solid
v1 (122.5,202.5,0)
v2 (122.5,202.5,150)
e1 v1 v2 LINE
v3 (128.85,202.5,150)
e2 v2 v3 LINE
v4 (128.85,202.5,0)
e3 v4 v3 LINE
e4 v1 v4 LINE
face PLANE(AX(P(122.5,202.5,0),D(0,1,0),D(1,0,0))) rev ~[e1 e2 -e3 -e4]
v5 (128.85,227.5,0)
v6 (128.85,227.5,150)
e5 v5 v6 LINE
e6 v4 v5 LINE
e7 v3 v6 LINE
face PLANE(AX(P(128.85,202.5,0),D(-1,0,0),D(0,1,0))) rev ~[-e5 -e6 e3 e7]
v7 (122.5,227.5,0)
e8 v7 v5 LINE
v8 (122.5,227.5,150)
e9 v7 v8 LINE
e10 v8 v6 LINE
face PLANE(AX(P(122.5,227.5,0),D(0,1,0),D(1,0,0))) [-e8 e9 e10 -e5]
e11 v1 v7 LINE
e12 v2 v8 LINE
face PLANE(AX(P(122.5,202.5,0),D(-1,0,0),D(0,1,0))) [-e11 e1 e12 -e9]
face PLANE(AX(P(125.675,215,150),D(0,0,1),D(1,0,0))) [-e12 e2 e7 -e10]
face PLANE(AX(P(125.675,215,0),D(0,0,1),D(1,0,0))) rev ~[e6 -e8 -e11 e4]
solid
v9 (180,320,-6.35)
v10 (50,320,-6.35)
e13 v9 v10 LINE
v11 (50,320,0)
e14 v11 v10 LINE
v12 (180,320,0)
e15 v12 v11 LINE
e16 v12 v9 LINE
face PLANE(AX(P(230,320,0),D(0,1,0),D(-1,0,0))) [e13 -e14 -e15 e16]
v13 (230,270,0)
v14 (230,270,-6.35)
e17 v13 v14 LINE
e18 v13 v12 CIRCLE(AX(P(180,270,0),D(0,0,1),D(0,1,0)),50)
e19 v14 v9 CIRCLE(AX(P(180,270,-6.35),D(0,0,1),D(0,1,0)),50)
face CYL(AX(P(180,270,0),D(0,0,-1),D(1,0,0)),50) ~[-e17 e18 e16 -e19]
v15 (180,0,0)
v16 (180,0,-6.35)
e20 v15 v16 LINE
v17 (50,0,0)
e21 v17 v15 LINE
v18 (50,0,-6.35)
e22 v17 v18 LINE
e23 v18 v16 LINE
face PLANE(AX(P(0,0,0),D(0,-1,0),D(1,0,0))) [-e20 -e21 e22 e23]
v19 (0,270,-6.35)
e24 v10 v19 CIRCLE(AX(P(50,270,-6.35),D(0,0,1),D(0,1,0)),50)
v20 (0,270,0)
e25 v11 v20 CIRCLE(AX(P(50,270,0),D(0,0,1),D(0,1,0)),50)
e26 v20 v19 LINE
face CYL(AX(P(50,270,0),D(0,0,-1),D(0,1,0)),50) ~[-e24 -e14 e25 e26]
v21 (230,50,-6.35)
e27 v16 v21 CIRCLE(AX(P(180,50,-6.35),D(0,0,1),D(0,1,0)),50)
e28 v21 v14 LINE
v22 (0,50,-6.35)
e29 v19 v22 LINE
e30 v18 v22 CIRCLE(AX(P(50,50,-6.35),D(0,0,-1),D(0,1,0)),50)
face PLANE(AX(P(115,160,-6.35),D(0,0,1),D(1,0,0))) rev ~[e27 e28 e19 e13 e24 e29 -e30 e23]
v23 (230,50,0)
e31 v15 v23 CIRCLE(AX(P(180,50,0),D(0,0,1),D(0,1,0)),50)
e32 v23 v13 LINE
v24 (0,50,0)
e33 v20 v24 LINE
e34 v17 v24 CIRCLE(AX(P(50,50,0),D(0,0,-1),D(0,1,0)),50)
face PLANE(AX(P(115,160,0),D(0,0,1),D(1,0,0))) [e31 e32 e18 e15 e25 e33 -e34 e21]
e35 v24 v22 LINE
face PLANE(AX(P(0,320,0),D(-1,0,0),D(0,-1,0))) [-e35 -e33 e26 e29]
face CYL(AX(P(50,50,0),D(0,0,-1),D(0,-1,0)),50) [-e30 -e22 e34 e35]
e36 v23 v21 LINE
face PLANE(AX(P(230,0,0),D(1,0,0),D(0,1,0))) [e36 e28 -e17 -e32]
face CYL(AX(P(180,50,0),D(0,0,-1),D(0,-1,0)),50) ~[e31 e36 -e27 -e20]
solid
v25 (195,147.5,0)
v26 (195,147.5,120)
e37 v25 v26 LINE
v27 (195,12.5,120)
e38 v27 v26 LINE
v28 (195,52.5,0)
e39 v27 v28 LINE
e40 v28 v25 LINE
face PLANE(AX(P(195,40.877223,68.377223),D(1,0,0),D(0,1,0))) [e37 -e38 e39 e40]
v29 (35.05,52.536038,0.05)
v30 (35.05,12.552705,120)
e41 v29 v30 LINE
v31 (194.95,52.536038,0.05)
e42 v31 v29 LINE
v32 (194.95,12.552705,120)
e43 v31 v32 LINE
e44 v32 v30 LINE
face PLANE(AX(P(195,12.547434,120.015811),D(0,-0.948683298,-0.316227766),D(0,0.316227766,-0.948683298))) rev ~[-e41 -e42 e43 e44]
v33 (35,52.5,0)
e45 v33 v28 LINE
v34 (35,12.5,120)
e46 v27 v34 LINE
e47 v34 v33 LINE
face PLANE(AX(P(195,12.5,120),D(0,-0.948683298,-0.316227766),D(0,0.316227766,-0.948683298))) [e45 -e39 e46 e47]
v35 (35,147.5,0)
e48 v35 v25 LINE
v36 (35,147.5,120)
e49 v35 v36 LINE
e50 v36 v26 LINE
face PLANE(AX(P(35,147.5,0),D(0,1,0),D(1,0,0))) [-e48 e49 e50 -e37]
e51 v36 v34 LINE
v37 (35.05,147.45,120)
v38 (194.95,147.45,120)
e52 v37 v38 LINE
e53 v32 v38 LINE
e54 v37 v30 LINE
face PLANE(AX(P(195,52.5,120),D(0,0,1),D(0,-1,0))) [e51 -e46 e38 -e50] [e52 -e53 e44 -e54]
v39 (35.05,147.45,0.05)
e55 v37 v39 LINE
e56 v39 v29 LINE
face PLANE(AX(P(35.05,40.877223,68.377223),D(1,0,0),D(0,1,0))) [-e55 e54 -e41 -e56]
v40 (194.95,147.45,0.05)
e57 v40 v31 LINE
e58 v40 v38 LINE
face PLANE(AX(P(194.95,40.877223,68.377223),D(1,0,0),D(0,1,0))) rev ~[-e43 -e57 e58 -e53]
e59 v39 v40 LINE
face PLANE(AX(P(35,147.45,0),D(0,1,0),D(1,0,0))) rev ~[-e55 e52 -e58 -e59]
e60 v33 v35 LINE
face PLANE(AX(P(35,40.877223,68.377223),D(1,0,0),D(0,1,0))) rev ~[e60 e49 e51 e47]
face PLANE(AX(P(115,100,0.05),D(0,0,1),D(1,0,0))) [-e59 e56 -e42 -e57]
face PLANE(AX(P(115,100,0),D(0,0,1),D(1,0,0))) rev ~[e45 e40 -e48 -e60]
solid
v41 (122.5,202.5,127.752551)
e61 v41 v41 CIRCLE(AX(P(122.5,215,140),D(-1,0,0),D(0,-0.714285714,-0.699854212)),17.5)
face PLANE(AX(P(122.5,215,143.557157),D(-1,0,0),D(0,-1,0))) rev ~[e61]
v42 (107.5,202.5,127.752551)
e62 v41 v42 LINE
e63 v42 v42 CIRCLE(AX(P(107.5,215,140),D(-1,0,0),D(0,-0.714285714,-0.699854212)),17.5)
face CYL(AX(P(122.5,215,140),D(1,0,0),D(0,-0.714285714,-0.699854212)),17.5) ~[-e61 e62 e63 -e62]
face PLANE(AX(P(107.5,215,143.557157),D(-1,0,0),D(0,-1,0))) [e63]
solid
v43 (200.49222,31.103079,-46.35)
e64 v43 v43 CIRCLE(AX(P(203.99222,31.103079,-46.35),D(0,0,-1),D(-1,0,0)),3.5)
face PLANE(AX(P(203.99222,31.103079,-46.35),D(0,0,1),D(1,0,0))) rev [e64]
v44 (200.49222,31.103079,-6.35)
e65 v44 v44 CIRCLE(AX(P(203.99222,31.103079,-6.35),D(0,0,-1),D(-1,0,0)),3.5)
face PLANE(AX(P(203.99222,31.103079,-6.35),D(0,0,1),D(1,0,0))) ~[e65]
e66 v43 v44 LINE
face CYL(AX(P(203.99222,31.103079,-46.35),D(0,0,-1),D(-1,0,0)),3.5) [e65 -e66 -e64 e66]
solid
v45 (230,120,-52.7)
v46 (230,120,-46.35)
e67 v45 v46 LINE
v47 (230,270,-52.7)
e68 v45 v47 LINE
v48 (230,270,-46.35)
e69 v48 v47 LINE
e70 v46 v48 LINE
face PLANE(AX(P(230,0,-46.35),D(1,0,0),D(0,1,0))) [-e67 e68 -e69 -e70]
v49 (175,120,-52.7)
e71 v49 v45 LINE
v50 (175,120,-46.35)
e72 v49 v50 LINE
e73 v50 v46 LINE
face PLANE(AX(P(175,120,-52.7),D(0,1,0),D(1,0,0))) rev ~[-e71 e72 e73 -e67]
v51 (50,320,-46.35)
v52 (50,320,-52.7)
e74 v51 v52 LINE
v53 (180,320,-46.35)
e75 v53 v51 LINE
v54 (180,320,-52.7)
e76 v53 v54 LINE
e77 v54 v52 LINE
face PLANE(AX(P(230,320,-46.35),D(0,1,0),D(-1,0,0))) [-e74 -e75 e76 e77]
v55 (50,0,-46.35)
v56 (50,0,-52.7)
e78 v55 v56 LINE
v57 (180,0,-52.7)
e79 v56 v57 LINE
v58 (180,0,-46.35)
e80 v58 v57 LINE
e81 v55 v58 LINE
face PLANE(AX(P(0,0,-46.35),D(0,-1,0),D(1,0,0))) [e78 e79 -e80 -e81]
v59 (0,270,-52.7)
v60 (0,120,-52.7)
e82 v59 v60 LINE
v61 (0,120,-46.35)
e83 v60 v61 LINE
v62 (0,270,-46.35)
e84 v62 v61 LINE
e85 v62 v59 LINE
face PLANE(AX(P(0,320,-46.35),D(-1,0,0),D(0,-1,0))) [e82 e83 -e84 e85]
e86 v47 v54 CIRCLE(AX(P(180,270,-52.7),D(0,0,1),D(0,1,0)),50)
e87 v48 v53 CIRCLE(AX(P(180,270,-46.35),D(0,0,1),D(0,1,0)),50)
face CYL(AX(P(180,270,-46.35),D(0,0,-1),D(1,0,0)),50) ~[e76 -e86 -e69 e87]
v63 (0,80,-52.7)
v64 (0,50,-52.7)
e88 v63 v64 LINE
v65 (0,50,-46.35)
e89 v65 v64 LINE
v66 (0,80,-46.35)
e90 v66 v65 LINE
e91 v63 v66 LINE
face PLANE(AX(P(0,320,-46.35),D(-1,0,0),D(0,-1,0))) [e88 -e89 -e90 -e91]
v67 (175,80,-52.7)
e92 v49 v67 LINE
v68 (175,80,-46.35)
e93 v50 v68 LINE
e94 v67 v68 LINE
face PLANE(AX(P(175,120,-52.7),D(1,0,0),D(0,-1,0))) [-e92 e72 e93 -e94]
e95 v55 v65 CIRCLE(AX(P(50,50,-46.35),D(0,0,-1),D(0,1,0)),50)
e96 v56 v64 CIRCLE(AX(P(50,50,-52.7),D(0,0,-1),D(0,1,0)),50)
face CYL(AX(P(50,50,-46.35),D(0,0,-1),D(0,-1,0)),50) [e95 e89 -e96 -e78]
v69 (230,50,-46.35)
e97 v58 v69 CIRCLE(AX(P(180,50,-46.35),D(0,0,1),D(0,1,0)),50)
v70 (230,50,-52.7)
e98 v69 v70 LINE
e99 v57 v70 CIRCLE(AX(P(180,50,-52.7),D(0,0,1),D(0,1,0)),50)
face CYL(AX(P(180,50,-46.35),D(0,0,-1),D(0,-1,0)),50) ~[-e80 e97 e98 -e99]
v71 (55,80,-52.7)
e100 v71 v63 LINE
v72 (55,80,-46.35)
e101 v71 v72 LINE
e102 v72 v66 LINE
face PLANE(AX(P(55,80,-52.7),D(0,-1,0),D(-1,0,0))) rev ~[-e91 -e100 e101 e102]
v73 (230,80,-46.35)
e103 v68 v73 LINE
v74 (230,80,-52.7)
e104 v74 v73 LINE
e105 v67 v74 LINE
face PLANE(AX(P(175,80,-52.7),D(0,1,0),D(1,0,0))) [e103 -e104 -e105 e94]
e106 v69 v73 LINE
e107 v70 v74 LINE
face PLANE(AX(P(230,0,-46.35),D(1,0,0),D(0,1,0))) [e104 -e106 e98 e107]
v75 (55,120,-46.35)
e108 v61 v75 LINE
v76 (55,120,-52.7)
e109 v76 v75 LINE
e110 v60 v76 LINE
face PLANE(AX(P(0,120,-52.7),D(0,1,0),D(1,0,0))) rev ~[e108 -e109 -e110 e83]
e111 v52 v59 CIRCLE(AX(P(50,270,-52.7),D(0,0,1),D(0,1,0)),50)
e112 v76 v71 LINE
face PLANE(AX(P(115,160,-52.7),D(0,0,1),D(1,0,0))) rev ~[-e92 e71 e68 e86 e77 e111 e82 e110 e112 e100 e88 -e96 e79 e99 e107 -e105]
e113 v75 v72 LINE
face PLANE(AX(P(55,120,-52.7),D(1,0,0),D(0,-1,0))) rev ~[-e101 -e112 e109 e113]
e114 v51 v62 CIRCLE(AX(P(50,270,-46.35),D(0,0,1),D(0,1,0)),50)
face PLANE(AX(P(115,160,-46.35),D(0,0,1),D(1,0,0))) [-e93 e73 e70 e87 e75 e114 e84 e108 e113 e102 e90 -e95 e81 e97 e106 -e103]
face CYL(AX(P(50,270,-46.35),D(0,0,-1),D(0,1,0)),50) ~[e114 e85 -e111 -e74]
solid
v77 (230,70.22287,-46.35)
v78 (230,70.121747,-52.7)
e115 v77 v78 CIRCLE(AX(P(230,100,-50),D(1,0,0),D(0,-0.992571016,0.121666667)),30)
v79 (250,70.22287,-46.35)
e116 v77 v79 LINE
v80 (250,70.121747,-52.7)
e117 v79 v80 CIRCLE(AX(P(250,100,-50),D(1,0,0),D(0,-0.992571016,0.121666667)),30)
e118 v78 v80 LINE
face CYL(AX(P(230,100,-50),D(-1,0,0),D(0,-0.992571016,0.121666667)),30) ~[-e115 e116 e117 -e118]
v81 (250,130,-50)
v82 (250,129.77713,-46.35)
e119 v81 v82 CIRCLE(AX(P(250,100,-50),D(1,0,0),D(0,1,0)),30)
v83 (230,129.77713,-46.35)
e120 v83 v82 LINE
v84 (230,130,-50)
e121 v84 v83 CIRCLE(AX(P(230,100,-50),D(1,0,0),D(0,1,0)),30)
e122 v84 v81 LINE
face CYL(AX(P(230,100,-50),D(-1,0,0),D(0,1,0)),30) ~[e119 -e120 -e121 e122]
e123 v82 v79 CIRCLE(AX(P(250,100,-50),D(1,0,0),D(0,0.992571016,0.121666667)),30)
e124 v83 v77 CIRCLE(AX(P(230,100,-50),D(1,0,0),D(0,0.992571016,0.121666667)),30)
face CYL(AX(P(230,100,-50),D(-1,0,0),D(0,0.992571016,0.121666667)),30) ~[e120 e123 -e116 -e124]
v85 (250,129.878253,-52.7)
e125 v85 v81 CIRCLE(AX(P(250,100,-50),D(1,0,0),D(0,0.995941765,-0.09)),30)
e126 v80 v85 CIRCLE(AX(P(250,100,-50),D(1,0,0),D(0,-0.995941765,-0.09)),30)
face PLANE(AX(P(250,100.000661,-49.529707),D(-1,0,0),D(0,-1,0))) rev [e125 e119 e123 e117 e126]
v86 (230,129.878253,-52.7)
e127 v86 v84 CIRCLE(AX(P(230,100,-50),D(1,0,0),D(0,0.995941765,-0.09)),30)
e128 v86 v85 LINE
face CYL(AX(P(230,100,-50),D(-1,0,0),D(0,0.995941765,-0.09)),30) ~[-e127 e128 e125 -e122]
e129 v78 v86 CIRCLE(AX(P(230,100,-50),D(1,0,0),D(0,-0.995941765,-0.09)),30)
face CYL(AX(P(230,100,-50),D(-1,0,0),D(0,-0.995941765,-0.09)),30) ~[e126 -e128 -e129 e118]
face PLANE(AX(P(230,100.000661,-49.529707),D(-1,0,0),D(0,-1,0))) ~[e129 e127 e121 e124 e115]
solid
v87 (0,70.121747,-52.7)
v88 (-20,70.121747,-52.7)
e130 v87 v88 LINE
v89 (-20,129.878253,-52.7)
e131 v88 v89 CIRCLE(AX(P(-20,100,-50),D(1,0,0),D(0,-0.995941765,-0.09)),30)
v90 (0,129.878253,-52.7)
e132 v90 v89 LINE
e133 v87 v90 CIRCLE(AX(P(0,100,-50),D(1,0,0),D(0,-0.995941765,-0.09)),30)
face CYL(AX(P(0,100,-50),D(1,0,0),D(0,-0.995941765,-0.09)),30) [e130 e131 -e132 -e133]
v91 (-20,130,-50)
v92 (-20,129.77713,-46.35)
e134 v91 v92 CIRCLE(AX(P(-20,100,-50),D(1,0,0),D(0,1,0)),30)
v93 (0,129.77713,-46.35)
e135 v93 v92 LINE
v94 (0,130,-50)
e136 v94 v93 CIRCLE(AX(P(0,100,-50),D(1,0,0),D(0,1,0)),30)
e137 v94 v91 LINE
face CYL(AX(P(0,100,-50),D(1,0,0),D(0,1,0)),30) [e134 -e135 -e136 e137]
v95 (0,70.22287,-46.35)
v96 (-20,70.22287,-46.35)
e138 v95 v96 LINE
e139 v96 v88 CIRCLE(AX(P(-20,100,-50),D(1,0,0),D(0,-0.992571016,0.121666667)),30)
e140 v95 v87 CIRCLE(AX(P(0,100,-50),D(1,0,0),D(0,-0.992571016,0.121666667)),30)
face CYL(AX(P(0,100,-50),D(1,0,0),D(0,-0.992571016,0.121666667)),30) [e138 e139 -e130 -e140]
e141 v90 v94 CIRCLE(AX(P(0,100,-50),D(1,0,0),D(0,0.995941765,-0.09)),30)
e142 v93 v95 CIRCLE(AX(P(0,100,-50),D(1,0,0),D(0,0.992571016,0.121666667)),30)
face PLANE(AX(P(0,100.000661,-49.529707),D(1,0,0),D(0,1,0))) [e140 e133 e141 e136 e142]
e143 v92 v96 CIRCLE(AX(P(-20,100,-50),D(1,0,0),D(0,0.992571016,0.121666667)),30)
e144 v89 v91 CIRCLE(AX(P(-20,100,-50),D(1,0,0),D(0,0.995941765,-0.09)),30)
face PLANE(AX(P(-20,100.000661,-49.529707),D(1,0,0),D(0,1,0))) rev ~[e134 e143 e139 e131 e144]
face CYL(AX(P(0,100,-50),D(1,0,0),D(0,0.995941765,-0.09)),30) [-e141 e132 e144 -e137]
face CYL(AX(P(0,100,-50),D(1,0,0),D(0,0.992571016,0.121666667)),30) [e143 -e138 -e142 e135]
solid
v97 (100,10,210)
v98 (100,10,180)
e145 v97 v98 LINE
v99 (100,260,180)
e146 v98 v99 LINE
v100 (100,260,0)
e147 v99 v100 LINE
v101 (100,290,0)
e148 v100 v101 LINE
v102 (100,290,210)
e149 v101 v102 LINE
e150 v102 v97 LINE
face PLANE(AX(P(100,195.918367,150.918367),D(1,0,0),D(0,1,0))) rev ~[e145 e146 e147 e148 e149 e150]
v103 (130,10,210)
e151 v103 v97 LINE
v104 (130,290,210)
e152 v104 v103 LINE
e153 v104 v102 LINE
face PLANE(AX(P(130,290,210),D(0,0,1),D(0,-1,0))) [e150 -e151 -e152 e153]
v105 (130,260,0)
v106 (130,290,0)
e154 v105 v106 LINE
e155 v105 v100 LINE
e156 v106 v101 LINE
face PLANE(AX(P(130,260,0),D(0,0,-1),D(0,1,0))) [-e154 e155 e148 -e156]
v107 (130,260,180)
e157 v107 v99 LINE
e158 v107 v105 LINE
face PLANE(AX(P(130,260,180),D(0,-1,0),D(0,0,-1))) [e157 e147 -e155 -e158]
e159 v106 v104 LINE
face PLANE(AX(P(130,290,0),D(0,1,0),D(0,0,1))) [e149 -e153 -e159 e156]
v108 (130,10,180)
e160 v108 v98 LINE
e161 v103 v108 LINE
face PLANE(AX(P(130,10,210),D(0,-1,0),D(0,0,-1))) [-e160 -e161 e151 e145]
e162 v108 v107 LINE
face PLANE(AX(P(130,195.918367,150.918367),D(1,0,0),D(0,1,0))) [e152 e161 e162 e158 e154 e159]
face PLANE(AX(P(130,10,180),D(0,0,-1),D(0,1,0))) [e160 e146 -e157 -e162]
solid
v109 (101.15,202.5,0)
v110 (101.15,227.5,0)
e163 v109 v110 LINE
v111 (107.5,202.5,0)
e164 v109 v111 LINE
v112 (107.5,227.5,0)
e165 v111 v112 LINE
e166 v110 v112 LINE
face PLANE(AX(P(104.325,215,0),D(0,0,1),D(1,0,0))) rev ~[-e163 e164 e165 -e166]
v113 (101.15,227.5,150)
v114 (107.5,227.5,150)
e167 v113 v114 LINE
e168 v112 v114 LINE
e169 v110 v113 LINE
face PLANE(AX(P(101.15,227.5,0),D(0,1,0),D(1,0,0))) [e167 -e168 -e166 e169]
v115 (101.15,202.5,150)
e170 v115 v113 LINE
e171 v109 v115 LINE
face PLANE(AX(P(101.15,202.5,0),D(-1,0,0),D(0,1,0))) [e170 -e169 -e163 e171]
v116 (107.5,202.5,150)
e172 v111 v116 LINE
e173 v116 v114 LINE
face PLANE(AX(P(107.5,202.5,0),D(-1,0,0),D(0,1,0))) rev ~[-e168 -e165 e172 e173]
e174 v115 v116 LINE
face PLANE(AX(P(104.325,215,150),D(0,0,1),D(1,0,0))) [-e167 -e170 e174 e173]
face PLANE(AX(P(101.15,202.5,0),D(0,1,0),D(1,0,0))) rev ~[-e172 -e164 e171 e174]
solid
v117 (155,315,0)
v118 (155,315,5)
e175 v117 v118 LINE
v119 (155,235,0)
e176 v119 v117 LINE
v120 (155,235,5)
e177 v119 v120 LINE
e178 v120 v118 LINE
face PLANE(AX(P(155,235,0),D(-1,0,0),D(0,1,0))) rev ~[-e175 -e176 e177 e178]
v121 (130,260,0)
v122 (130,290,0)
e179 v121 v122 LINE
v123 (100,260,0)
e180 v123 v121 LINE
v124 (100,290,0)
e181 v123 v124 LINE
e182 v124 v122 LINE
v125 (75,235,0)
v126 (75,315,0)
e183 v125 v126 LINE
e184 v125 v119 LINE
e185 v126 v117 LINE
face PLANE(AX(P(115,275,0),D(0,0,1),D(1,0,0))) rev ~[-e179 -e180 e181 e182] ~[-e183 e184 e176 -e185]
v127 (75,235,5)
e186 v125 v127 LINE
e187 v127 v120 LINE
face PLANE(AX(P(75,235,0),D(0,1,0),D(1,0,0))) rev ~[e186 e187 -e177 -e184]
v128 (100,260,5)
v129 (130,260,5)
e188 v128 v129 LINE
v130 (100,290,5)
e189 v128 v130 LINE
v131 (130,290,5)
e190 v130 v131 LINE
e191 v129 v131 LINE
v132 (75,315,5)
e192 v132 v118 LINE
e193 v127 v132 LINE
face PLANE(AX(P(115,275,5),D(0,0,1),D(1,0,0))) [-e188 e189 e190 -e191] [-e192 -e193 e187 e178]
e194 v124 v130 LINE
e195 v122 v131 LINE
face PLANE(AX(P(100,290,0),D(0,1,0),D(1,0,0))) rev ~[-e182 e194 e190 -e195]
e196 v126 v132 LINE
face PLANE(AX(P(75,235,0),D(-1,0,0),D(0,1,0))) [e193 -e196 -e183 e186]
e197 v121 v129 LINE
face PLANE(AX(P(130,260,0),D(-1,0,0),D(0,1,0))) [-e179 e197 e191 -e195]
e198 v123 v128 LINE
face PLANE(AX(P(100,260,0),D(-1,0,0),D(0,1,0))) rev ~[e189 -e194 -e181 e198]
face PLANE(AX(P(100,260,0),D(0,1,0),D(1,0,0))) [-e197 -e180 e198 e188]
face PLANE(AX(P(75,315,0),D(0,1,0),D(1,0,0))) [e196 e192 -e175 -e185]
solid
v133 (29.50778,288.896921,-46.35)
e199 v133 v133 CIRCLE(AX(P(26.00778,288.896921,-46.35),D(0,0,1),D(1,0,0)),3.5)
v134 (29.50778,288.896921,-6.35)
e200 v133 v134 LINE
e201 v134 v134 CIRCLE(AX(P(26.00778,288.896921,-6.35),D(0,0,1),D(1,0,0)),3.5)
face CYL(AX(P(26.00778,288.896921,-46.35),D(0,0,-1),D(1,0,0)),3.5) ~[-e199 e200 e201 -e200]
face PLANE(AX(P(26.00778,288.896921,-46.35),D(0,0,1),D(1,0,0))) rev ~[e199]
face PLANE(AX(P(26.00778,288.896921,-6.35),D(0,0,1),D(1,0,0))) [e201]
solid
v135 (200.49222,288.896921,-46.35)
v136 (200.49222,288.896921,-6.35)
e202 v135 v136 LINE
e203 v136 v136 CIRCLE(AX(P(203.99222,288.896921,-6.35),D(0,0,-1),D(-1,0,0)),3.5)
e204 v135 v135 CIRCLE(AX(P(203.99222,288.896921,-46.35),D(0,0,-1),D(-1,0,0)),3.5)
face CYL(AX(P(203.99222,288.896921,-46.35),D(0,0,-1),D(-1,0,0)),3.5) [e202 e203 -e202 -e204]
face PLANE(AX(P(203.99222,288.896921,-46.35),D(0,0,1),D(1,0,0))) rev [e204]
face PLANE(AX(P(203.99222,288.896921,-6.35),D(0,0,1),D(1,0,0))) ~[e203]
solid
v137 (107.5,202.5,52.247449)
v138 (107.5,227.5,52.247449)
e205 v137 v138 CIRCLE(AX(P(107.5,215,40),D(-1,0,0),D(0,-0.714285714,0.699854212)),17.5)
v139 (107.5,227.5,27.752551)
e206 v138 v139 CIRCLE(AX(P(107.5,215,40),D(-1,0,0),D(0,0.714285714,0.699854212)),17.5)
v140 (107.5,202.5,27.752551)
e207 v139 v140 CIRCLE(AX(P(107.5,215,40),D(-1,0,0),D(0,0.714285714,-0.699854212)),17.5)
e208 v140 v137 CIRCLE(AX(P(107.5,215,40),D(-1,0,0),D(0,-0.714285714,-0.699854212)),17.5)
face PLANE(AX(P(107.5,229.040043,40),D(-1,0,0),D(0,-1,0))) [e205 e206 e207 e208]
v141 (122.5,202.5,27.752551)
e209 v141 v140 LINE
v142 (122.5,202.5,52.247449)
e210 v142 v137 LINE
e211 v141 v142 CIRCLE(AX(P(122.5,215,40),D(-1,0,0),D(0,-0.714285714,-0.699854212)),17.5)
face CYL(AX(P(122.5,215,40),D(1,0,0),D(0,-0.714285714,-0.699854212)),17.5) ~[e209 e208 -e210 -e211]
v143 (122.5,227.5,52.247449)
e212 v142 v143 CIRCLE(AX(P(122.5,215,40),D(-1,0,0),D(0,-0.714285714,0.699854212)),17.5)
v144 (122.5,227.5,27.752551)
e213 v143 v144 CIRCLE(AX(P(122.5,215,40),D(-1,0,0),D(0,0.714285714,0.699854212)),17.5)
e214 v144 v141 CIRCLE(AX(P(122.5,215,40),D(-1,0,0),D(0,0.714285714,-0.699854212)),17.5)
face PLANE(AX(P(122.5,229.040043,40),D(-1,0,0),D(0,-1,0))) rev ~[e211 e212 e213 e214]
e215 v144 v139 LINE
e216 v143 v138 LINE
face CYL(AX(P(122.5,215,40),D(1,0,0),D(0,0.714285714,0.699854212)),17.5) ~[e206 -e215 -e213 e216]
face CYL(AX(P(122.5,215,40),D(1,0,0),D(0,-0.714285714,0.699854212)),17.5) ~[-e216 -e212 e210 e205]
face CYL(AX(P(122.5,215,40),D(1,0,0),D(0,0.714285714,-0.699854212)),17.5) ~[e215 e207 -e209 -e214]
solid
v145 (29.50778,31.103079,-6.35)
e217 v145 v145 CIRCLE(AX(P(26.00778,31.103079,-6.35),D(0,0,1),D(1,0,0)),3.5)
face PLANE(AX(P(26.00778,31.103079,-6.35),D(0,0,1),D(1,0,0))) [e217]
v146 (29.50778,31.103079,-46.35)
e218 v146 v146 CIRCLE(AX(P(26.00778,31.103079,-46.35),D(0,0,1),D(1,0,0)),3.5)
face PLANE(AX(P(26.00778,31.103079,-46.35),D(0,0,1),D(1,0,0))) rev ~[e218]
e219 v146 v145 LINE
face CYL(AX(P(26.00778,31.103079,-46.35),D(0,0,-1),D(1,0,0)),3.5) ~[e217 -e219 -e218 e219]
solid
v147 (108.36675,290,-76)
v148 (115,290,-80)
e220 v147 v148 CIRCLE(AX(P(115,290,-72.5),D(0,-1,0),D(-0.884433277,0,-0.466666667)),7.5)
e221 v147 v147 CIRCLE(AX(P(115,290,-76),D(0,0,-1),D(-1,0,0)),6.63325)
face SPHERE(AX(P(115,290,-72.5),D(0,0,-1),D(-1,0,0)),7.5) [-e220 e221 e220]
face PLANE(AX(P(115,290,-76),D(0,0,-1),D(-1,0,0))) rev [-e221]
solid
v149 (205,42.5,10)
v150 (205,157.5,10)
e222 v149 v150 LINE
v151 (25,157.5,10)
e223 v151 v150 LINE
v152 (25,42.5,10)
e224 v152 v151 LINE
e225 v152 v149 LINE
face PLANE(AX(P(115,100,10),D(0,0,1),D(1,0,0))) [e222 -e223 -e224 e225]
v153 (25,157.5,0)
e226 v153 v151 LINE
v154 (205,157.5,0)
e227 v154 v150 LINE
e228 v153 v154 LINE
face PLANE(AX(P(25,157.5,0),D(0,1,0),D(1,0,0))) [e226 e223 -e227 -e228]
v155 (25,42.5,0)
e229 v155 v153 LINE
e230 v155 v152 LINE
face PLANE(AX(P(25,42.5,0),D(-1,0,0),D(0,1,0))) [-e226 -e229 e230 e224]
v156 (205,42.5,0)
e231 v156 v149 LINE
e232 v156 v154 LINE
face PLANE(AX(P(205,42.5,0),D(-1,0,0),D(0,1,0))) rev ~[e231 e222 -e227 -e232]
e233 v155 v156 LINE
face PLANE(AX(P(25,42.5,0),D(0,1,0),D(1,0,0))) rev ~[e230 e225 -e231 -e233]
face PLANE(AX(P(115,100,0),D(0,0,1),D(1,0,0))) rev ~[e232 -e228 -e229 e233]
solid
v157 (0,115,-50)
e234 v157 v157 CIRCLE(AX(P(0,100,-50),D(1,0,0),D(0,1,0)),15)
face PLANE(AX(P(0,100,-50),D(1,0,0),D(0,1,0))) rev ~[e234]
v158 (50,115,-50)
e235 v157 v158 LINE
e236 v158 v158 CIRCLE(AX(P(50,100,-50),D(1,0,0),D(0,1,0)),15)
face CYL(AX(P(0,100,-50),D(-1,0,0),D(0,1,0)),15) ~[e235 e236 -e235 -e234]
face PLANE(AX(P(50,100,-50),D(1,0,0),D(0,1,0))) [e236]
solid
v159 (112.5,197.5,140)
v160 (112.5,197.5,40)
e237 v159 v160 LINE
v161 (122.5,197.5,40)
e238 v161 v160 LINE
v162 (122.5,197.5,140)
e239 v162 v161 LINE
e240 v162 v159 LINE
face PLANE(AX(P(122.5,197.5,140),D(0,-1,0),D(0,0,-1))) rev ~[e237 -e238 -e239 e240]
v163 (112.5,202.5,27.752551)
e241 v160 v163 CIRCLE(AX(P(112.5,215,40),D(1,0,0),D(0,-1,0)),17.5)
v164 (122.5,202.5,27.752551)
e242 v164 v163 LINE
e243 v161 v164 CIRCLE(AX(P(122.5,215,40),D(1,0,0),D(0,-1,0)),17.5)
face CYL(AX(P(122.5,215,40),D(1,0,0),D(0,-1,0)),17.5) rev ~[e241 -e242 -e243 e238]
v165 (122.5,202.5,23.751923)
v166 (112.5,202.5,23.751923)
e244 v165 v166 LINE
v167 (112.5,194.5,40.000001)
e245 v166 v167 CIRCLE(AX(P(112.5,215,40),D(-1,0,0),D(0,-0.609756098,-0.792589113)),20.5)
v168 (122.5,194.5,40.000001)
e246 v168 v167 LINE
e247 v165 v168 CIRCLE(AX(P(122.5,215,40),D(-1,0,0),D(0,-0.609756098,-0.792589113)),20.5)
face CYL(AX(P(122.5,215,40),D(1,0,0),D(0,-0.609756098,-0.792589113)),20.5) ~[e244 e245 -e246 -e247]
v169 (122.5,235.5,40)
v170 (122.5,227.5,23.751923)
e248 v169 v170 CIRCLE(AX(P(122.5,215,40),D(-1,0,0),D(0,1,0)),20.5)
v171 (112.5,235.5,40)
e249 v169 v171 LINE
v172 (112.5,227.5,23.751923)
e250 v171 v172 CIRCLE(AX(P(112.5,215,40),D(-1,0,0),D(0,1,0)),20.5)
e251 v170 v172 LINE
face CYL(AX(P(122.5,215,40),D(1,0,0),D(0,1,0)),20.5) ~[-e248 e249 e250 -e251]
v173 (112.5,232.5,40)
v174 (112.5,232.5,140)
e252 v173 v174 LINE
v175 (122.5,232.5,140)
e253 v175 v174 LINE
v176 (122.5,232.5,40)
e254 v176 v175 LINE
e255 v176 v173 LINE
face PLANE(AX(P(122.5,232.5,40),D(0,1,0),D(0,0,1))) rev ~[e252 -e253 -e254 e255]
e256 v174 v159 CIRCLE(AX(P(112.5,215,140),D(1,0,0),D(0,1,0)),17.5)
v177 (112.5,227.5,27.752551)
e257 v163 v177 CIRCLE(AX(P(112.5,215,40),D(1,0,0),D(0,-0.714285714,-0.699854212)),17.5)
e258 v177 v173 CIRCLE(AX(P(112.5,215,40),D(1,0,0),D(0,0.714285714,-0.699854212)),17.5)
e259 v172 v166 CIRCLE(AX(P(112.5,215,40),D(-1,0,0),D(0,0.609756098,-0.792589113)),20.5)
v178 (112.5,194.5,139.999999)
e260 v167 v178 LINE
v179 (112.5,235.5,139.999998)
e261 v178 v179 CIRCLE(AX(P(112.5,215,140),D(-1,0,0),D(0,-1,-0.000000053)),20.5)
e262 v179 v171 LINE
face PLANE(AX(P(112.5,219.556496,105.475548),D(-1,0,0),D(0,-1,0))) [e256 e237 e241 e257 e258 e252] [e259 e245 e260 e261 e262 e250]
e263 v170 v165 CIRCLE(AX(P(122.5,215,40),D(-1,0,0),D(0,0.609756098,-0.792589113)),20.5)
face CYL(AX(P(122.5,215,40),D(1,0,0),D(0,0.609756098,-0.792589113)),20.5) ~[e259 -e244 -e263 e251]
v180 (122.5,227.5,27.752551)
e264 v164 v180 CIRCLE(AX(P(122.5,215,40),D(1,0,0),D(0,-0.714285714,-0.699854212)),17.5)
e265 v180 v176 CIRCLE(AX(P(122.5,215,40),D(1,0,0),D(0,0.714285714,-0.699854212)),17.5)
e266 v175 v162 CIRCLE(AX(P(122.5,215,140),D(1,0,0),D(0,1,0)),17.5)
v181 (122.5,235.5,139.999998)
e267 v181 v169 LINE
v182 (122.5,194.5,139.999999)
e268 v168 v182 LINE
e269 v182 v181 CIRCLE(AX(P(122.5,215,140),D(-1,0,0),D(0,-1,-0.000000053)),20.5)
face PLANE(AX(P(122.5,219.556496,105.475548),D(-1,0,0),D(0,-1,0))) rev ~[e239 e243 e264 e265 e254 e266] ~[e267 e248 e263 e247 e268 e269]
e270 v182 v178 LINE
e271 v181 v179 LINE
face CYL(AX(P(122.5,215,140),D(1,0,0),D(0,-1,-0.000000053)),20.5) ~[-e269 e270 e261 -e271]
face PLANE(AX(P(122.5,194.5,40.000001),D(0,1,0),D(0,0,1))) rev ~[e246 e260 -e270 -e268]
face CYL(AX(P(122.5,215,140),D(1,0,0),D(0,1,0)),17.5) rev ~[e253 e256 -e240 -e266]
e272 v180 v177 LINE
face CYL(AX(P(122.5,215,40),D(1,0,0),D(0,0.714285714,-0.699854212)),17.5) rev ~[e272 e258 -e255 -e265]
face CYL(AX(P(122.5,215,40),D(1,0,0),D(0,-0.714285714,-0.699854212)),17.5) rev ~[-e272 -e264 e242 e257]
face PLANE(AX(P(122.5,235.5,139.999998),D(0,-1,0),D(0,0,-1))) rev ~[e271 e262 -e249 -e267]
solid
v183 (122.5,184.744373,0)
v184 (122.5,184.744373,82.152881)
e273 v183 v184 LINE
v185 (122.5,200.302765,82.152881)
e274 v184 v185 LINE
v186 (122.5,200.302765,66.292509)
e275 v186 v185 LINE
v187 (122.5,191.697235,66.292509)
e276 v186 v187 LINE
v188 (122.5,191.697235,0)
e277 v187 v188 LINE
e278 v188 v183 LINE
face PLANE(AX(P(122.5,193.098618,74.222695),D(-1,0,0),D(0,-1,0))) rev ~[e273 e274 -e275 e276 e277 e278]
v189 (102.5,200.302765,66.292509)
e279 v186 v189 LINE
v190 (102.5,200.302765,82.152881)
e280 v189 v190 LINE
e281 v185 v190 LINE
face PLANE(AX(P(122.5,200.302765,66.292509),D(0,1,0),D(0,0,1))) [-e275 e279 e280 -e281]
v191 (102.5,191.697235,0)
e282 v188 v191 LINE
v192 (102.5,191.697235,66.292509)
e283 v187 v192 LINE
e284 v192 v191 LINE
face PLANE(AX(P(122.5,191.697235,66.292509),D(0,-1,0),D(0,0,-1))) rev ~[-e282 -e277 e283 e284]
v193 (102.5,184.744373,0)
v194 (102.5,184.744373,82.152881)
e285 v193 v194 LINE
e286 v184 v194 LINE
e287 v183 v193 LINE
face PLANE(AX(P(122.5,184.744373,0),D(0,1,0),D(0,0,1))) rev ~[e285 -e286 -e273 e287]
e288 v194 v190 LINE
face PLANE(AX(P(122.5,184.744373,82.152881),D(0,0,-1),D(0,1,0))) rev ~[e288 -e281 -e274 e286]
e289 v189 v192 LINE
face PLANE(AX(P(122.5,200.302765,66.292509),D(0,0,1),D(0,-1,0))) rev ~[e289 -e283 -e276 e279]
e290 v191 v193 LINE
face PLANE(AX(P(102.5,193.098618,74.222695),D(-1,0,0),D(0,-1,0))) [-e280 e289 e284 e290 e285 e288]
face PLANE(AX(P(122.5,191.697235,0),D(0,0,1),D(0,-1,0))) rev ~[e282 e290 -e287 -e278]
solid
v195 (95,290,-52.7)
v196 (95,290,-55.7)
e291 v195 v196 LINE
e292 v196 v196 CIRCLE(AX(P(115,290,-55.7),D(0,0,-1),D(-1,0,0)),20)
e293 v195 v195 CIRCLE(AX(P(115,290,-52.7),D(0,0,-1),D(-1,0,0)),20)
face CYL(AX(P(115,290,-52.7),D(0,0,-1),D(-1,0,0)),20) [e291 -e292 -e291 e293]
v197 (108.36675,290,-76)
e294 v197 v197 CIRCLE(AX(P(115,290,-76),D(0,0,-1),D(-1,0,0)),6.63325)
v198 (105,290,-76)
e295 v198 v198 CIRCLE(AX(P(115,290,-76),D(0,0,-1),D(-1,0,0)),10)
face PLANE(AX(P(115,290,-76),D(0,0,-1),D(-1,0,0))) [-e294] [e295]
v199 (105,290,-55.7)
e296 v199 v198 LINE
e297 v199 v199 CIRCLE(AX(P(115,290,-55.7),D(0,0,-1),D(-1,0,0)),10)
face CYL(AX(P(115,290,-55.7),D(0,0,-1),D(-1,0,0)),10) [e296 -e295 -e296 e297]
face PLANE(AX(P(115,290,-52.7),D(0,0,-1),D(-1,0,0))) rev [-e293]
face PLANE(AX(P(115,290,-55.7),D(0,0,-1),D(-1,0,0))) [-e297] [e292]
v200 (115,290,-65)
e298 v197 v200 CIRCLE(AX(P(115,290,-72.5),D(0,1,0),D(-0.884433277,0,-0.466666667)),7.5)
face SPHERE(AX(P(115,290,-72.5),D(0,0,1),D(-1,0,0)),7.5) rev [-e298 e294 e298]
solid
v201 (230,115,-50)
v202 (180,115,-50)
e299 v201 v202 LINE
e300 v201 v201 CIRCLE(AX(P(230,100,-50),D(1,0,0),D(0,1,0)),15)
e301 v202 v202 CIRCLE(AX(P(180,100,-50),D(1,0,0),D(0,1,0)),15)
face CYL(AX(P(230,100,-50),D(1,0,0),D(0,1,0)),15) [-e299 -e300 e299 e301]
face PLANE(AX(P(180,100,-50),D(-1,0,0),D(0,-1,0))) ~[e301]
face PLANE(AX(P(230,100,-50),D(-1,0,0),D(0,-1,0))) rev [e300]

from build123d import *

# Parameters (mm, degrees)
F2_DEPTH  = 6.35
F3_START  = -46.35
F3_DEPTH  = 6.35
F4_R      = 50
F4_2_R    = 50
F6_DEPTH  = 20
F7_R      = 15
F8_DEPTH  = 50
F9_R      = 3.5
F10_DEPTH = 40
F11_W     = 160
F11_H     = 95
F12_DEPTH = 120
F11_W_2   = 80
F11_H_2   = 80
F11_W_3   = 30
F11_H_3   = 30
F13_DEPTH = 5
F15_DEPTH = 160
F16_T     = -0.05
F17_W     = 55
F17_H     = 40
F18_DEPTH = 6.35
F24_DEPTH = 30
F11_W_4   = 180
F11_H_4   = 115
F26_DEPTH = 10
F11_W_5   = 6.35
F11_H_5   = 25
F27_DEPTH = 150
F29_DEPTH = 15
F28_W     = 3
F28_H     = 15.8603712916
F30_DEPTH = 10
F28_W_2   = 2.8027647734
F31_DEPTH = 20


# Not quite as in the source:
# - a feature names something its author has since deleted; it is built from what else it names


with BuildPart() as f2:
    # F0 (on Top) → F2 (new body, through all)
    with BuildSketch(Plane.XY):
        Polygon((0, 70), (0, 0), (230, 0), (230, 70), (230, 130), (230, 320), (0, 320), (0, 130), align=None)
    extrude(amount=-F2_DEPTH)

    # F4
    f4_edges = [f2.edges().sort_by_distance(p)[0] for p in [
        (230, 0, -3.175),
        (230, 320, -3.175),
        (0, 320, -3.175),
        (0, 0, -3.175),
    ]]
    fillet(f4_edges, radius=F4_R)


with BuildPart() as f3:
    # F0 (on Top) → F3 (new body)
    with BuildSketch(Plane.XY.offset(F3_START)):
        Polygon((0, 70), (0, 0), (230, 0), (230, 70), (230, 130), (230, 320), (0, 320), (0, 130), align=None)
    extrude(amount=-F3_DEPTH)

    # F4#2
    f4_2_edges = [f3.edges().sort_by_distance(p)[0] for p in [
        (230, 0, -49.525),
        (230, 320, -49.525),
        (0, 320, -49.525),
        (0, 0, -49.525),
    ]]
    fillet(f4_2_edges, radius=F4_2_R)

    # F17 (on face) → F18 (cut, through all)
    with BuildSketch(Plane(origin=(0, 0, -52.7), x_dir=(1, 0, 0), z_dir=(0, 0, -1))):
        Polygon((0, -80), (0, -85), (0, -115), (0, -120), (55, -120), (55, -80), align=None)
        with Locations((202.5, -100)):
            Rectangle(F17_W, F17_H)
    extrude(amount=-F18_DEPTH, mode=Mode.SUBTRACT)


with BuildPart() as f6:
    # F1 (on Right) → F6 (new body, through all)
    with BuildSketch(Plane.YZ):
        with BuildLine():
            ThreePointArc((70.2228695137, -46.35), (70.0038032651, -49.5223165915), (70.121747039, -52.7))
            Line((70.121747039, -52.7), (129.878252961, -52.7))
            ThreePointArc((129.878252961, -52.7), (129.9695477846, -51.3513717421), (130, -50))
            ThreePointArc((130, -50), (129.9442307848, -48.1716010542), (129.7771304863, -46.35))
            Line((129.7771304863, -46.35), (70.2228695137, -46.35))
        make_face()
        with BuildLine():
            Line((129.878252961, -52.7), (70.121747039, -52.7))
            ThreePointArc((70.121747039, -52.7), (100, -80), (129.878252961, -52.7))
        make_face()
        with BuildLine():
            ThreePointArc((129.7771304863, -46.35), (100, -20), (70.2228695137, -46.35))
            Line((70.2228695137, -46.35), (129.7771304863, -46.35))
        make_face()
    extrude(amount=-F6_DEPTH)


with BuildPart() as f8:
    # F7 (on face) → F8 (new body)
    with BuildSketch(Plane.YZ):
        with Locations((100, -50)):
            Circle(F7_R)
    extrude(amount=F8_DEPTH)


with BuildPart() as f10:
    # F9 (on face) → F10 (new body, through all)
    with BuildSketch(Plane.XY.offset(-46.35)):
        with Locations((26.0077804742, 288.8969213205)):
            Circle(F9_R)
    extrude(amount=F10_DEPTH)


with BuildPart() as f10b:
    # F9 (on face) → F10, piece 2 (new body, through all)
    with BuildSketch(Plane.XY.offset(-46.35)):
        with Locations((26.0077804742, 31.1030786795)):
            Circle(F9_R)
    extrude(amount=F10_DEPTH)


with BuildPart() as f12:
    # F11 (on face) → F12 (new body)
    with BuildSketch(Plane.XY):
        with Locations((115, 100)):
            Rectangle(F11_W, F11_H)
    extrude(amount=F12_DEPTH)

    # F14 (on face) → F15 (join, through all)
    with BuildSketch(Plane.YZ.offset(195)):
        Polygon((12.5, 120), (52.5, 0), (52.5, 120), align=None)
    extrude(amount=-F15_DEPTH)

    # F16
    f16_openings = [f12.faces().sort_by_distance(p)[0] for p in [
        (115, 80, 120),
    ]]
    offset(amount=F16_T, openings=f16_openings)


with BuildPart() as f13:
    # F11 (on face) → F13 (new body)
    with BuildSketch(Plane.XY):
        with Locations((115, 275)):
            Rectangle(F11_W_2, F11_H_2)
        with Locations((115, 275)):
            Rectangle(F11_W_3, F11_H_3, mode=Mode.SUBTRACT)
    extrude(amount=F13_DEPTH)


with BuildPart() as f21:
    # F20 (on plane+point) → F21 (revolve)
    with BuildSketch(Plane.XZ.offset(-290)):
        with BuildLine():
            Line((115, -80), (115, -76))
            Line((115, -76), (108.3667504193, -76))
            ThreePointArc((108.3667504193, -76), (111.1270166538, -78.9226162893), (115, -80))
        make_face()
    revolve(axis=Axis((115, 290, -64.35), (0, 0, -1)))


with BuildPart() as f21b:
    # F20 (on plane+point) → F21, piece 2 (revolve)
    with BuildSketch(Plane.XZ.offset(-290)):
        with BuildLine():
            Line((115, -65), (115, -52.7))
            Line((115, -52.7), (95, -52.7))
            Line((95, -52.7), (95, -55.7))
            Line((95, -55.7), (105, -55.7))
            Line((105, -55.7), (105, -76))
            Line((105, -76), (108.3667504193, -76))
            ThreePointArc((108.3667504193, -76), (108.5773837107, -68.6270166538), (115, -65))
        make_face()
    revolve(axis=Axis((115, 290, -64.35), (0, 0, -1)))


with BuildPart() as f24:
    # F23 (on plane+point) → F24 (new body, through all)
    with BuildSketch(Plane.YZ.offset(130)):
        Polygon((260, 0), (290, 0), (290, 210), (260, 210), (10, 210), (10, 180), (260, 180), align=None)
    extrude(amount=-F24_DEPTH)


with BuildPart() as f25_1:
    # F25: instance of F6
    add(f6.part.mirror(Plane(origin=(115, 160, -3.175), x_dir=(0, -1, 0), z_dir=(-1, 0, 0))))


with BuildPart() as f25_2:
    # F25: instance of F8
    add(f8.part.mirror(Plane(origin=(115, 160, -3.175), x_dir=(0, -1, 0), z_dir=(-1, 0, 0))))


with BuildPart() as f25_3:
    # F25: instance of F10
    add(f10.part.mirror(Plane(origin=(115, 160, -3.175), x_dir=(0, -1, 0), z_dir=(-1, 0, 0))))


with BuildPart() as f25_4:
    # F25: instance of F10b
    add(f10b.part.mirror(Plane(origin=(115, 160, -3.175), x_dir=(0, -1, 0), z_dir=(-1, 0, 0))))


with BuildPart() as f26:
    # F11 (on face) → F26 (new body)
    with BuildSketch(Plane.XY):
        with Locations((115, 100)):
            Rectangle(F11_W_4, F11_H_4)
        with Locations((115, 100)):
            Rectangle(F11_W, F11_H, mode=Mode.SUBTRACT)
        with Locations((115, 100)):
            Rectangle(F11_W, F11_H)
    extrude(amount=F26_DEPTH)


with BuildPart() as f27:
    # F11 (on face) → F27 (new body)
    with BuildSketch(Plane.XY):
        with Locations((125.675, 215)):
            Rectangle(F11_W_5, F11_H_5)
    extrude(amount=F27_DEPTH)


with BuildPart() as f27b:
    # F11 (on face) → F27, piece 2 (new body)
    with BuildSketch(Plane.XY):
        with Locations((104.325, 215)):
            Rectangle(F11_W_5, F11_H_5)
    extrude(amount=F27_DEPTH)


with BuildPart() as f29:
    # F28 (on face) → F29 (new body, through all)
    with BuildSketch(Plane(origin=(122.5, 0, 0), x_dir=(0, -1, 0), z_dir=(-1, 0, 0))):
        with BuildLine():
            ThreePointArc((-202.5, 127.7525512861), (-198.798148254, 133.3856217223), (-197.5, 140))
            ThreePointArc((-197.5, 140), (-215, 157.5), (-232.5, 140))
            ThreePointArc((-232.5, 140), (-231.201851746, 133.3856217223), (-227.5, 127.7525512861))
            Line((-227.5, 127.7525512861), (-227.5, 150))
            Line((-227.5, 150), (-202.5, 150))
            Line((-202.5, 150), (-202.5, 127.7525512861))
        make_face()
        with BuildLine():
            ThreePointArc((-227.5, 127.7525512861), (-215, 122.5), (-202.5, 127.7525512861))
            Line((-202.5, 127.7525512861), (-202.5, 150))
            Line((-202.5, 150), (-227.5, 150))
            Line((-227.5, 150), (-227.5, 127.7525512861))
        make_face()
    extrude(amount=F29_DEPTH)


with BuildPart() as f29b:
    # F28 (on face) → F29, piece 2 (new body, through all)
    with BuildSketch(Plane(origin=(122.5, 0, 0), x_dir=(0, -1, 0), z_dir=(-1, 0, 0))):
        with BuildLine():
            ThreePointArc((-227.5, 52.2474487139), (-231.201851746, 46.6143782777), (-232.5, 40))
            ThreePointArc((-232.5, 40), (-231.201851746, 33.3856217223), (-227.5, 27.7525512861))
            Line((-227.5, 27.7525512861), (-227.5, 52.2474487139))
        make_face()
        with BuildLine():
            Line((-202.5, 27.7525512861), (-202.5, 52.2474487139))
            ThreePointArc((-202.5, 52.2474487139), (-215, 57.5), (-227.5, 52.2474487139))
            Line((-227.5, 52.2474487139), (-227.5, 27.7525512861))
            ThreePointArc((-227.5, 27.7525512861), (-215, 22.5), (-202.5, 27.7525512861))
        make_face()
        with BuildLine():
            ThreePointArc((-197.5, 40), (-198.798148254, 46.6143782777), (-202.5, 52.2474487139))
            Line((-202.5, 52.2474487139), (-202.5, 27.7525512861))
            ThreePointArc((-202.5, 27.7525512861), (-198.798148254, 33.3856217223), (-197.5, 40))
        make_face()
    extrude(amount=F29_DEPTH)


with BuildPart() as f30:
    # F28 (on face) → F30 (new body)
    with BuildSketch(Plane(origin=(122.5, 0, 0), x_dir=(0, -1, 0), z_dir=(-1, 0, 0))):
        with BuildLine():
            ThreePointArc((-232.5, 140), (-215, 157.5), (-197.5, 140))
            Line((-197.5, 140), (-197.5, 82.1528807282))
            Line((-197.5, 82.1528807282), (-194.5, 82.1528807282))
            Line((-194.5, 82.1528807282), (-194.5, 139.999998906))
            ThreePointArc((-194.5, 139.999998906), (-215.0000002942, 160.5), (-235.5, 139.9999983177))
            Line((-235.5, 139.9999983177), (-235.5, 40))
            ThreePointArc((-235.5, 40), (-233.3915741577, 30.9446148619), (-227.5, 23.7519231907))
            Line((-227.5, 23.7519231907), (-227.5, 27.7525512861))
            ThreePointArc((-227.5, 27.7525512861), (-231.201851746, 33.3856217223), (-232.5, 40))
            Line((-232.5, 40), (-232.5, 140))
        make_face()
        with Locations((-196, 74.2226950824)):
            Rectangle(F28_W, F28_H)
        with BuildLine():
            Line((-194.5, 66.2925094366), (-197.5, 66.2925094366))
            Line((-197.5, 66.2925094366), (-197.5, 40))
            ThreePointArc((-197.5, 40), (-198.798148254, 33.3856217223), (-202.5, 27.7525512861))
            Line((-202.5, 27.7525512861), (-202.5, 23.7519231907))
            ThreePointArc((-202.5, 23.7519231907), (-196.6084257123, 30.9446151258), (-194.5, 40.0000005884))
            Line((-194.5, 40.0000005884), (-194.5, 66.2925094366))
        make_face()
        with BuildLine():
            ThreePointArc((-202.5, 27.7525512861), (-215, 22.5), (-227.5, 27.7525512861))
            Line((-227.5, 27.7525512861), (-227.5, 23.7519231907))
            ThreePointArc((-227.5, 23.7519231907), (-215, 19.5), (-202.5, 23.7519231907))
            Line((-202.5, 23.7519231907), (-202.5, 27.7525512861))
        make_face()
    extrude(amount=F30_DEPTH)


with BuildPart() as f31:
    # F28 (on face) → F31 (new body)
    with BuildSketch(Plane(origin=(122.5, 0, 0), x_dir=(0, -1, 0), z_dir=(-1, 0, 0))):
        with Locations((-193.0986176133, 74.2226950824)):
            Rectangle(F28_W_2, F28_H)
        with Locations((-198.9013823867, 74.2226950824)):
            Rectangle(F28_W_2, F28_H)
        with Locations((-196, 74.2226950824)):
            Rectangle(F28_W, F28_H)
        Polygon((-184.7443729639, 82.1528807282), (-191.6972352266, 82.1528807282), (-191.6972352266, 66.2925094366), (-191.6972352266, 0), (-184.7443729639, 0), align=None)
    extrude(amount=F31_DEPTH)


solid = Compound([f2.part, f3.part, f6.part, f8.part, f10.part, f10b.part, f12.part, f13.part, f21.part, f21b.part, f24.part, f25_1.part, f25_2.part, f25_3.part, f25_4.part, f26.part, f27.part, f27b.part, f29.part, f29b.part, f30.part, f31.part])
